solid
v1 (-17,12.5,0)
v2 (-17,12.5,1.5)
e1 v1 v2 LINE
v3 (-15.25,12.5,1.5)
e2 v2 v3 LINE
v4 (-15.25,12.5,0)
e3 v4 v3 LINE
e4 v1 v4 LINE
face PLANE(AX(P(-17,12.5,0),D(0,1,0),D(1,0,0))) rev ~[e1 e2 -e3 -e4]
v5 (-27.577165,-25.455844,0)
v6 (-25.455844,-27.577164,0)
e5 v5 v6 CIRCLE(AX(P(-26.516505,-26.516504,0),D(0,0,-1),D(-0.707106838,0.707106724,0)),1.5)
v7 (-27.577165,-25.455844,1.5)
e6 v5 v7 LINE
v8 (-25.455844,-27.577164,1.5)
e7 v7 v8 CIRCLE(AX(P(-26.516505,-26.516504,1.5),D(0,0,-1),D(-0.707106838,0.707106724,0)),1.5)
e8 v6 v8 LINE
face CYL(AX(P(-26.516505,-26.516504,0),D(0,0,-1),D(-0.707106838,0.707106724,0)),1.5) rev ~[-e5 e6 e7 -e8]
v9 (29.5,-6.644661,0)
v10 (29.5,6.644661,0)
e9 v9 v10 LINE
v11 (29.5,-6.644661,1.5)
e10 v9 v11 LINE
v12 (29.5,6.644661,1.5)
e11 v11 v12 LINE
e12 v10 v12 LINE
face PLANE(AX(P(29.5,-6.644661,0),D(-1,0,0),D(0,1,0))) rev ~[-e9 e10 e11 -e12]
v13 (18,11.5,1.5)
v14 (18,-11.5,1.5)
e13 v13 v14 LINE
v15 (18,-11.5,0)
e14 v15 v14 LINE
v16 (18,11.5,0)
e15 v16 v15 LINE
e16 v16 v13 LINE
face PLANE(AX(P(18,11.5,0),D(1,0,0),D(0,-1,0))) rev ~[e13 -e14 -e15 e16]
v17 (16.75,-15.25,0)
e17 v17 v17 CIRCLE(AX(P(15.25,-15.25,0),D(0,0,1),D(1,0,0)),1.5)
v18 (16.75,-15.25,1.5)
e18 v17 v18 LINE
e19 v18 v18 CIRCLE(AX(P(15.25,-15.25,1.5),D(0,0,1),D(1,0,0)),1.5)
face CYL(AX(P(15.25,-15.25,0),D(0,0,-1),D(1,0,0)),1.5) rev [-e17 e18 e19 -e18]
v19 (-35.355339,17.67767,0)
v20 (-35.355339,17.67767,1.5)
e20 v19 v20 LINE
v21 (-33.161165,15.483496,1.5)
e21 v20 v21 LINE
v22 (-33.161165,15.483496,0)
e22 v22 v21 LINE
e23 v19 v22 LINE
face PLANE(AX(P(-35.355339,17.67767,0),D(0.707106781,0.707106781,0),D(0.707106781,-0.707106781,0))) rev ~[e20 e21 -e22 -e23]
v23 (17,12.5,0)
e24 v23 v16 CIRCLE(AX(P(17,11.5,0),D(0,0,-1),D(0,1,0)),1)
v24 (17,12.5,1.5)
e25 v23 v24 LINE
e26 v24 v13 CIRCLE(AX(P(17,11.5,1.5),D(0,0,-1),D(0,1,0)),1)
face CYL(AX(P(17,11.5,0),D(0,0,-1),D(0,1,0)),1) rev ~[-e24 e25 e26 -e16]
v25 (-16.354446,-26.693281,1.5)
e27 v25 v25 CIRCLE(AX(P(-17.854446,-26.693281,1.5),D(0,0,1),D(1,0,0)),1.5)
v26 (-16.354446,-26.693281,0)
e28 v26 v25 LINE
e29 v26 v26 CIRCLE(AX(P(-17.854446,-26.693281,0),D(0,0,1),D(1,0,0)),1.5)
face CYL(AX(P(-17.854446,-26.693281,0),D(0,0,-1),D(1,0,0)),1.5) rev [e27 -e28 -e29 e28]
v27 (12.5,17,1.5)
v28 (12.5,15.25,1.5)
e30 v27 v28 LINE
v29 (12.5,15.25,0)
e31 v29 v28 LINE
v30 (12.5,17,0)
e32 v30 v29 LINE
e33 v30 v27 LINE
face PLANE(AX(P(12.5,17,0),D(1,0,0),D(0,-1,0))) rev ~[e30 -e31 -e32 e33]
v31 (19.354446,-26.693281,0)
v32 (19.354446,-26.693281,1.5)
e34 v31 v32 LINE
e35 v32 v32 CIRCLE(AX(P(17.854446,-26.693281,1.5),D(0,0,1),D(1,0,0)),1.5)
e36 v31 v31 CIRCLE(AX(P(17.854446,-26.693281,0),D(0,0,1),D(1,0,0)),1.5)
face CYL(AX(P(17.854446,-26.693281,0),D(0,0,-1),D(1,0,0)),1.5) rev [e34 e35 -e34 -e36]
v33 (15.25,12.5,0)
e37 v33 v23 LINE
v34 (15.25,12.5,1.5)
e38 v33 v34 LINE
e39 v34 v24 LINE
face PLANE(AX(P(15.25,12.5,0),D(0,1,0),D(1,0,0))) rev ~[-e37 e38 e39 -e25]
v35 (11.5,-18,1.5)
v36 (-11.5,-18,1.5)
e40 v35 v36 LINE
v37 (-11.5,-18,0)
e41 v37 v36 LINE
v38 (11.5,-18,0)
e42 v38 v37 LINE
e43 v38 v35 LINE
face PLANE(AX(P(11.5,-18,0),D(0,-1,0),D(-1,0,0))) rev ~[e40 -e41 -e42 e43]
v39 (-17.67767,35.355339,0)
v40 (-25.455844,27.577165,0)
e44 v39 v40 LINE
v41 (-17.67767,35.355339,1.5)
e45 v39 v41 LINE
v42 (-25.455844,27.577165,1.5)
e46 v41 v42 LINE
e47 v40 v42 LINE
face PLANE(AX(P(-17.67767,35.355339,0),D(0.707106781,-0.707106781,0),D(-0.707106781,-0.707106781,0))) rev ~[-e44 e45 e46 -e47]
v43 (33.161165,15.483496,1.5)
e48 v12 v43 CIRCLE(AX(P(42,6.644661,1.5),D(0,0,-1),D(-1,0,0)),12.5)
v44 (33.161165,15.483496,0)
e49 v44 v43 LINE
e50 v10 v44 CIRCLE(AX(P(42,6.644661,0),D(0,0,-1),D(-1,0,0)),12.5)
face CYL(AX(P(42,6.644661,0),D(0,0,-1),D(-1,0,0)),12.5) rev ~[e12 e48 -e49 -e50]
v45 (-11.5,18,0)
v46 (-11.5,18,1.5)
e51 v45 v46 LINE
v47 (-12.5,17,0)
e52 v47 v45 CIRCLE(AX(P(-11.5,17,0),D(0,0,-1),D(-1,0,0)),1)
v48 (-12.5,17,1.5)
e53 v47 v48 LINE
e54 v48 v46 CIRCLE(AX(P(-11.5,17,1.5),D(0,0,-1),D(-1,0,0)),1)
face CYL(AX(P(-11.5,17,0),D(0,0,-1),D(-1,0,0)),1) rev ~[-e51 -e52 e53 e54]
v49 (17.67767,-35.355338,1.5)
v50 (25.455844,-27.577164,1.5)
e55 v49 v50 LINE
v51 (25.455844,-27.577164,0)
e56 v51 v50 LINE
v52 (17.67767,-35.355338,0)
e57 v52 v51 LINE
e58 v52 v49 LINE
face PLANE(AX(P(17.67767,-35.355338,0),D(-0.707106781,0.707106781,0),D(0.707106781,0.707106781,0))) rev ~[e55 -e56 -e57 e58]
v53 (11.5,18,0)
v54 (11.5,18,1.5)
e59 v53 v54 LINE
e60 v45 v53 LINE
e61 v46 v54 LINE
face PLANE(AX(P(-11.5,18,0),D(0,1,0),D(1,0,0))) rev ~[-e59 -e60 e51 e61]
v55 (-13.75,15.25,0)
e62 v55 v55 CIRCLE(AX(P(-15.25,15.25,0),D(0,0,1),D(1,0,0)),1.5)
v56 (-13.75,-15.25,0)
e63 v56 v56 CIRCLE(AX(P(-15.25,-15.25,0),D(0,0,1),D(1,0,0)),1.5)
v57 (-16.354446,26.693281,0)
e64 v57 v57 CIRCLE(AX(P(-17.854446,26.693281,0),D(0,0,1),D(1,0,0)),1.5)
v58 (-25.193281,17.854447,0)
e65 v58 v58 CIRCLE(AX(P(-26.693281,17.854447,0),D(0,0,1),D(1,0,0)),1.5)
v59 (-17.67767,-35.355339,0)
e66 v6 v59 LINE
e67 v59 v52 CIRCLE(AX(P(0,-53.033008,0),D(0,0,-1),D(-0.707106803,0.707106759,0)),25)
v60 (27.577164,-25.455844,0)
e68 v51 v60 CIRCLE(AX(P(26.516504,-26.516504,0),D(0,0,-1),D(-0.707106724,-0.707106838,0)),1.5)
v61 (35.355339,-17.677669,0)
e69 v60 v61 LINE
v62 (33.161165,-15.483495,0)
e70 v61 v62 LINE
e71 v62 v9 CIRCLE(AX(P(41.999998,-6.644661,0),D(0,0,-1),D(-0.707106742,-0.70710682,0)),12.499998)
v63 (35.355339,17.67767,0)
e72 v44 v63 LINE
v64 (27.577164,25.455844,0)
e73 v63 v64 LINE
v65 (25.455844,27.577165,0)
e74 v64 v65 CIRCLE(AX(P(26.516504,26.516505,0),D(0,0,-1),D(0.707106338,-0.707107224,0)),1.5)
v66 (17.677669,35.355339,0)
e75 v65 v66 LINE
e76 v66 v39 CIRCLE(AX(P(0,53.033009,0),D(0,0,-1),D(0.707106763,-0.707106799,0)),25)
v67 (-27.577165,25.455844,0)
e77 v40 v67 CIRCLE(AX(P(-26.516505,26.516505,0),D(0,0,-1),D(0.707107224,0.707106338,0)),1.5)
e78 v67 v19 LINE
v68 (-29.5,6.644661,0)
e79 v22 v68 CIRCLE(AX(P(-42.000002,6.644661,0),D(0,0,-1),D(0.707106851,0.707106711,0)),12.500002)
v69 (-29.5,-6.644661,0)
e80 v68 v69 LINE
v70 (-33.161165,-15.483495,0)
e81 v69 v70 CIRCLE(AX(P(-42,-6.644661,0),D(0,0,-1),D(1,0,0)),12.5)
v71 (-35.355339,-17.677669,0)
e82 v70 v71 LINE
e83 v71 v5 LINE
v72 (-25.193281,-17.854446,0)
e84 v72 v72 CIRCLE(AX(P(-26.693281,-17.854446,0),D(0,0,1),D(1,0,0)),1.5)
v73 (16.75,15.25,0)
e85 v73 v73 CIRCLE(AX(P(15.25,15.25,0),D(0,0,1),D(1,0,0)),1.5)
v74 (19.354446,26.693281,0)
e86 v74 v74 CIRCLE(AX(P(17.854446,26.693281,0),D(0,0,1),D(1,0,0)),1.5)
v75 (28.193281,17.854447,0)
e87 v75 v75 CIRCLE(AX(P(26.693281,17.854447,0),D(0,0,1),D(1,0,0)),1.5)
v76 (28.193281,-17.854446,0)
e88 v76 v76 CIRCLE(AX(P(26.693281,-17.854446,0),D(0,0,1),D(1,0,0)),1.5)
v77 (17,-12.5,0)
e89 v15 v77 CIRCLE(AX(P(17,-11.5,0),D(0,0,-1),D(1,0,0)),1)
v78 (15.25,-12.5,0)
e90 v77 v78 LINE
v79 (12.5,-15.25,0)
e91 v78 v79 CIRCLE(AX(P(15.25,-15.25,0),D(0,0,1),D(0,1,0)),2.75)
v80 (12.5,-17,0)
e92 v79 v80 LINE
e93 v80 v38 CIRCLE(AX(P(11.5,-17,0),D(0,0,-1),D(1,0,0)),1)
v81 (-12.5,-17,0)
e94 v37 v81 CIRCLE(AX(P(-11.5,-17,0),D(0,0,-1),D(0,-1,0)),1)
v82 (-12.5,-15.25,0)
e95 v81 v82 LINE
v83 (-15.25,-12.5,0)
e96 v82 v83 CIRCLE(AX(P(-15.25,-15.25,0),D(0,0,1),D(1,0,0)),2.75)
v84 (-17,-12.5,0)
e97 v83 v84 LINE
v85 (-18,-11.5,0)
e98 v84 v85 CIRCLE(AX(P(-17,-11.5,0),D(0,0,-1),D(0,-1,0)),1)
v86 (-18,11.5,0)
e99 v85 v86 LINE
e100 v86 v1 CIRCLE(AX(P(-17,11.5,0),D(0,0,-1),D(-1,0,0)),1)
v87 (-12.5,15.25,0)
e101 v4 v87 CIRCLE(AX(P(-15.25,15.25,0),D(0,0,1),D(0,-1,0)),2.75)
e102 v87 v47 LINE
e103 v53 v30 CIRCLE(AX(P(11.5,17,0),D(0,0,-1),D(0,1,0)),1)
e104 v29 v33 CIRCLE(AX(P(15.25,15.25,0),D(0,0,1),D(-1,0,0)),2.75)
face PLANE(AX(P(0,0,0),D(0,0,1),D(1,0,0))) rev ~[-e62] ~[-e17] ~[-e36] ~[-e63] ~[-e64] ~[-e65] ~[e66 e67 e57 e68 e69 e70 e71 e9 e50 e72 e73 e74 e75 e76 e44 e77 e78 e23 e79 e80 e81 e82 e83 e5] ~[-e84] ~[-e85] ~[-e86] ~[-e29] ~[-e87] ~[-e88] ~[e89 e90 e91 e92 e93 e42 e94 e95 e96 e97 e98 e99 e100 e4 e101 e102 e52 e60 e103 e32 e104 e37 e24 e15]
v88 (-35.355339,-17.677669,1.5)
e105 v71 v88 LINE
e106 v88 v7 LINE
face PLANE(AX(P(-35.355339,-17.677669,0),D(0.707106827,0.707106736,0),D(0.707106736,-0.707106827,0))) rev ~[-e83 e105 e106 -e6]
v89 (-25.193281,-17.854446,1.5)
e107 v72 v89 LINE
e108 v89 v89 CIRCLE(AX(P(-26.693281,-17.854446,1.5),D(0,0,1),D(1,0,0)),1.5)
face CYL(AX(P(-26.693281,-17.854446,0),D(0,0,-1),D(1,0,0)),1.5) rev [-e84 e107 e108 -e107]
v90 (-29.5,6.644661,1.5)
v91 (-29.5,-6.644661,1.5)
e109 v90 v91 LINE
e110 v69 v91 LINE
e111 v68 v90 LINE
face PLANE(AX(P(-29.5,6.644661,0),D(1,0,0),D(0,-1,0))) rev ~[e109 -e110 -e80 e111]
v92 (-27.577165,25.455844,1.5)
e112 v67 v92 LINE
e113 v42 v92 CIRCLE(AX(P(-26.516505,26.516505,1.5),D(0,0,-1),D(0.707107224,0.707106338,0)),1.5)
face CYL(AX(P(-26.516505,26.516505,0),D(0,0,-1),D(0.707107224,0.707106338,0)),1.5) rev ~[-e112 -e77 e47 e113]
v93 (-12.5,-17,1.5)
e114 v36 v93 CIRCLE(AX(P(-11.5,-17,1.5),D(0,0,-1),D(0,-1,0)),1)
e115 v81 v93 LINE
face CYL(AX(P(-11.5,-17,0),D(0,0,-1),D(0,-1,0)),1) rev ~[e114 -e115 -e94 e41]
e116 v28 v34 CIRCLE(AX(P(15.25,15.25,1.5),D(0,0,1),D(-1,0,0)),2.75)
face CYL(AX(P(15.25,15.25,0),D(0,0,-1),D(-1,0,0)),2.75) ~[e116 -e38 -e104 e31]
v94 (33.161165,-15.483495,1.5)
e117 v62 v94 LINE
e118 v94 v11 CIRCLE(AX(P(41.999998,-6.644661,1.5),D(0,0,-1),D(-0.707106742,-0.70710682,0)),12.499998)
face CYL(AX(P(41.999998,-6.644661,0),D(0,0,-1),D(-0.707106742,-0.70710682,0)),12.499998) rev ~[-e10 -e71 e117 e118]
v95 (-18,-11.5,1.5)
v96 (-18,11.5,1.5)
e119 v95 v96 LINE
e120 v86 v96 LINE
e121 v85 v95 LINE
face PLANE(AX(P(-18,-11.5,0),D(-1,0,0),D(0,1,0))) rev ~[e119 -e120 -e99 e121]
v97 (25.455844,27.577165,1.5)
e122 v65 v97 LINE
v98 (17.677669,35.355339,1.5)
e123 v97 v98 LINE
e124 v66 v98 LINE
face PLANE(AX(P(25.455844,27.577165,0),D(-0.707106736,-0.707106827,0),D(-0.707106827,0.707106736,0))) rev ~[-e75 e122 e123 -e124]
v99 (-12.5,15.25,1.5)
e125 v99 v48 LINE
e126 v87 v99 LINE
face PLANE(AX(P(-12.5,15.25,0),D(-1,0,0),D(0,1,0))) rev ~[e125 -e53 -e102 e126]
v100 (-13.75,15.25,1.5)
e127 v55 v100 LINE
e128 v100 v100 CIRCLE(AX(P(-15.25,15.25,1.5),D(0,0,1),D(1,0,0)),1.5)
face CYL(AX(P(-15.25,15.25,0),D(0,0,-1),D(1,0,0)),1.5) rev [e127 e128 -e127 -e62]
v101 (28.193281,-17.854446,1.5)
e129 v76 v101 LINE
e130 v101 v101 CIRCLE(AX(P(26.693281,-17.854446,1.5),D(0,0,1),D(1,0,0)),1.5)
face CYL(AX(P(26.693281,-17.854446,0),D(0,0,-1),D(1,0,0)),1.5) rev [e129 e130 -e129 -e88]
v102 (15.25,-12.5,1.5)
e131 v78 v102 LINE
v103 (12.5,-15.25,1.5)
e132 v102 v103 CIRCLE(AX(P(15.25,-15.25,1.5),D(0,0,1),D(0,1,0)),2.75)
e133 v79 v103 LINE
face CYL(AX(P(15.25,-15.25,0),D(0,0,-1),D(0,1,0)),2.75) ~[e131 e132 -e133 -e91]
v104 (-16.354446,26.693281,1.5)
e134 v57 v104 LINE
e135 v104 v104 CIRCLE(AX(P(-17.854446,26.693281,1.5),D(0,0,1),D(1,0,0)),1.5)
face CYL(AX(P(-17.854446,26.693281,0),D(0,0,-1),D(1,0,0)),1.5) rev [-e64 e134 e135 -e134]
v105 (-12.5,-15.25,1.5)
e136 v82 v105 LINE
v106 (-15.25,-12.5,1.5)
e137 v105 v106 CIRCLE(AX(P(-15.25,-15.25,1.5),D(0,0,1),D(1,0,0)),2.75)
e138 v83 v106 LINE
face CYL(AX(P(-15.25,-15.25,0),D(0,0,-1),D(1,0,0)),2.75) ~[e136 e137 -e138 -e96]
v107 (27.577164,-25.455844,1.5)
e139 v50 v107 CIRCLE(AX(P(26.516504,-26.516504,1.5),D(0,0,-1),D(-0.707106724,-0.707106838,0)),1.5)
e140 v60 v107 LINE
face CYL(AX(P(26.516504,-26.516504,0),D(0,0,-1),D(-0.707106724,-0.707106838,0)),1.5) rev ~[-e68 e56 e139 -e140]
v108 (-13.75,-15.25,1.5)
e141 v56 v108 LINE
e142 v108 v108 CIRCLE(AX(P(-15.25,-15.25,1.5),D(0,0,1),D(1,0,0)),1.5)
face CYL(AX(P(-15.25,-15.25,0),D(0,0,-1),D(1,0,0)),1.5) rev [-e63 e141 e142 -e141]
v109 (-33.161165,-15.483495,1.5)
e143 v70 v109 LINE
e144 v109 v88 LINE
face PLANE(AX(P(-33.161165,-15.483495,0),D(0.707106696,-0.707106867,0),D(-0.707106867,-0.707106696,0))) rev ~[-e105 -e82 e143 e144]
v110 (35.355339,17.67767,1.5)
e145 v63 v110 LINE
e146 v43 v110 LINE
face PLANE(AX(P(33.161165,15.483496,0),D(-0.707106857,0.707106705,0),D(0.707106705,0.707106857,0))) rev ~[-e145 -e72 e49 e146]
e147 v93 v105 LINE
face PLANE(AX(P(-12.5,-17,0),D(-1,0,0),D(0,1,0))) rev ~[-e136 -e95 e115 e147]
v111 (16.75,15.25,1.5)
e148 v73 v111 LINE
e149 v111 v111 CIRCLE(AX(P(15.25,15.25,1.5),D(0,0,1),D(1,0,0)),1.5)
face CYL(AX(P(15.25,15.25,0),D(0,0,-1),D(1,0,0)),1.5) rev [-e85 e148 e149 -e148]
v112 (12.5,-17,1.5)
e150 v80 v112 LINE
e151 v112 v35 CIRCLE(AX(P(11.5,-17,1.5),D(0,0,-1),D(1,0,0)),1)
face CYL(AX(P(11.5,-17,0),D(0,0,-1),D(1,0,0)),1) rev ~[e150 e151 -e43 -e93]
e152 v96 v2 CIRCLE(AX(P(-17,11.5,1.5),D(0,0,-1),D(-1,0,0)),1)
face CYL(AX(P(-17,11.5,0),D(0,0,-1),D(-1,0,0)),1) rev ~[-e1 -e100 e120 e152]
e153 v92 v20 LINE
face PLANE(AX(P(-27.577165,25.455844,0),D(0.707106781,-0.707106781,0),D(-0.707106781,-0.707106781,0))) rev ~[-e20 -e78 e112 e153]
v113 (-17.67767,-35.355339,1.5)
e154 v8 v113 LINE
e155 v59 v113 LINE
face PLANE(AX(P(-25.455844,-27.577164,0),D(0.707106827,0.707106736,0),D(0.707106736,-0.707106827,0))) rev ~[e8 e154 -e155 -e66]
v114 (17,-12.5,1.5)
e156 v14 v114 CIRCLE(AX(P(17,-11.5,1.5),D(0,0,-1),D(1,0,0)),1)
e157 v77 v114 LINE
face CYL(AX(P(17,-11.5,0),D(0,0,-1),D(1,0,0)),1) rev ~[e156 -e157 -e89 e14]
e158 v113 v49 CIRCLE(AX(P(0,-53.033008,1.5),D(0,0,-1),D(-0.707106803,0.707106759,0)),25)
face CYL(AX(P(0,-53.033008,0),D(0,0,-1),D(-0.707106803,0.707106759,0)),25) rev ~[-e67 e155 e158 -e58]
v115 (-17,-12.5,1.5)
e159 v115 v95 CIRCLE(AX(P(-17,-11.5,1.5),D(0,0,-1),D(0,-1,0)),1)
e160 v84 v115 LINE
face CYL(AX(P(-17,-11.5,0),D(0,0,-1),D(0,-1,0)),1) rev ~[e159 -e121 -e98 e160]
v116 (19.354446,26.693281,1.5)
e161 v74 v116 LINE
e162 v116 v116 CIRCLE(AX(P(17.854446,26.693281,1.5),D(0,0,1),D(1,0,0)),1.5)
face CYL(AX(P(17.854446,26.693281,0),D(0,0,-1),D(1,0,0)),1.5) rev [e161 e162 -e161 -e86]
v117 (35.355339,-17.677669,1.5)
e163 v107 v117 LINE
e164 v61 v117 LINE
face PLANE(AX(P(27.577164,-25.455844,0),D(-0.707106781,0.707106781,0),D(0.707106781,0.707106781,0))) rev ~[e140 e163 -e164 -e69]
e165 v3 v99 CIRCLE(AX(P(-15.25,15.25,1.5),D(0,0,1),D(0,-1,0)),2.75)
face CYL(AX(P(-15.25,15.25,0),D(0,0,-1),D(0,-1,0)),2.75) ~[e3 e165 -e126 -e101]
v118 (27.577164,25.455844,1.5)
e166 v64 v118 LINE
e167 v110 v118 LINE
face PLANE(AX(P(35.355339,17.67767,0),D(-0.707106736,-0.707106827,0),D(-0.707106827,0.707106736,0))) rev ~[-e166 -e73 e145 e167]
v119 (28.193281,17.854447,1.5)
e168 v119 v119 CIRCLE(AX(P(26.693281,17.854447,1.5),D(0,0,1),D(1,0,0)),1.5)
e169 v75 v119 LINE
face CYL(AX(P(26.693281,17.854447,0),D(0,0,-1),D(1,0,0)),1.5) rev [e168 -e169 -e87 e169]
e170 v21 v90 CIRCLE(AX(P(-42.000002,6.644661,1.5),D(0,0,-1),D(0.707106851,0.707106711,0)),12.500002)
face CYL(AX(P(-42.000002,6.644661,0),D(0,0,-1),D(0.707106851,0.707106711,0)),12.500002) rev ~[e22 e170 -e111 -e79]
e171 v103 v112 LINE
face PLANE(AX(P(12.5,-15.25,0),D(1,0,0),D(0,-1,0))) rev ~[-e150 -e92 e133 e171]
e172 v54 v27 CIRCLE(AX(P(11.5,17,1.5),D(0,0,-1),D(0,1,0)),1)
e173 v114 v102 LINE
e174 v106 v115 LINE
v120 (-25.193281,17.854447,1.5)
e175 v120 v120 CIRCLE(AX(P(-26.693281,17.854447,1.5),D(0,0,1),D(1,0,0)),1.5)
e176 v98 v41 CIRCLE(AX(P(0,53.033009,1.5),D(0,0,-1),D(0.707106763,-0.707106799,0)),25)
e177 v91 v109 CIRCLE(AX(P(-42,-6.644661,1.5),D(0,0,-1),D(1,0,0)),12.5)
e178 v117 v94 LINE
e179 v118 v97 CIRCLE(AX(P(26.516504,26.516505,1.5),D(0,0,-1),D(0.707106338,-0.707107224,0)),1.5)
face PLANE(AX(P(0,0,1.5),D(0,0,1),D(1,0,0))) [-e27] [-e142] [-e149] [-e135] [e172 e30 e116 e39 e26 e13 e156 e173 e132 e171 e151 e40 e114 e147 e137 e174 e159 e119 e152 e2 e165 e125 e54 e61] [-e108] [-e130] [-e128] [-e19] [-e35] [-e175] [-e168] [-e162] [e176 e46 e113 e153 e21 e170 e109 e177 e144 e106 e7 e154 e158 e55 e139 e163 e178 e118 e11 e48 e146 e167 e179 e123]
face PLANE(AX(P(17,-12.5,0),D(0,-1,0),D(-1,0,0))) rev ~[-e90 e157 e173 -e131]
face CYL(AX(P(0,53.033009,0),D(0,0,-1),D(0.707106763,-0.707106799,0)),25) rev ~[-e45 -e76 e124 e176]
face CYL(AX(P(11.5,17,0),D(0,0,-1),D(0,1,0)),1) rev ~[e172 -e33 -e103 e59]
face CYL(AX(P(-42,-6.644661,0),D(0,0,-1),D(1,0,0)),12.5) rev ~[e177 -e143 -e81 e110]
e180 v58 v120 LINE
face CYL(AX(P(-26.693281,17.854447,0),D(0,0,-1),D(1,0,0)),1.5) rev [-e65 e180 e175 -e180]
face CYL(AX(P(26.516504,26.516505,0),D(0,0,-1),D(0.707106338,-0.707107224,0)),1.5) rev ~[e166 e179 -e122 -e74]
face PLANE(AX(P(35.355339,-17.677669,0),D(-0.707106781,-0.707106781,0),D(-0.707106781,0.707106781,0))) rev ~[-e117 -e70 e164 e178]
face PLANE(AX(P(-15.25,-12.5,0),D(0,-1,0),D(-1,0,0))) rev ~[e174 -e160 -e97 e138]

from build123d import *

# Parameters (mm, degrees)
F0_R     = 1.5
F1_DEPTH = 1.5


# Not quite as in the source:
# - ends of sketch curves that miss each other by under 0.0002 mm in the source are joined


with BuildPart() as f1:
    # F0 (on Top) → F1 (new body)
    with BuildSketch(Plane.XY):
        with BuildLine():
            Line((-29.5, 6.644661), (-29.5, 0))
            Line((-29.5, 0), (-29.5, -6.644661))
            ThreePointArc((-29.5, -6.644661), (-30.4515057083, -11.4282035779), (-33.1611647352, -15.4834952648))
            Line((-33.1611647352, -15.4834952648), (-35.355339, -17.677669))
            Line((-35.355339, -17.677669), (-27.577165, -25.455844))
            ThreePointArc((-27.577165, -25.455844), (-25.4558450782, -25.4558435782), (-25.4558443282, -27.5771636718))
            Line((-25.4558443282, -27.5771636718), (-17.67767, -35.355339))
            ThreePointArc((-17.67767, -35.355339), (-3.536e-07, -28.033008), (17.6776695297, -35.3553384703))
            Line((17.6776695297, -35.3553384703), (25.455844, -27.577164))
            ThreePointArc((25.455844, -27.577164), (25.4558438282, -25.4558438282), (27.5771641718, -25.4558438282))
            Line((27.5771641718, -25.4558438282), (35.355339, -17.677669))
            Line((35.355339, -17.677669), (33.161165, -15.483495))
            ThreePointArc((33.161165, -15.483495), (30.4515057083, -11.4282035779), (29.5, -6.644661))
            Line((29.5, -6.644661), (29.5, 0))
            Line((29.5, 0), (29.5, 6.644661))
            ThreePointArc((29.5, 6.644661), (30.4515058436, 11.4282039046), (33.1611652352, 15.4834957648))
            Line((33.1611652352, 15.4834957648), (35.355339, 17.67767))
            Line((35.355339, 17.67767), (27.577164, 25.455844))
            ThreePointArc((27.577164, 25.455844), (25.4558435782, 25.4558450782), (25.4558438282, 27.5771651718))
            Line((25.4558438282, 27.5771651718), (17.677669, 35.355339))
            ThreePointArc((17.677669, 35.355339), (-3.536e-07, 28.033009), (-17.6776695297, 35.3553394703))
            Line((-17.6776695297, 35.3553394703), (-25.455844, 27.577165))
            ThreePointArc((-25.455844, 27.577165), (-25.4558448282, 25.4558448282), (-27.5771646718, 25.4558443282))
            Line((-27.5771646718, 25.4558443282), (-35.355339, 17.67767))
            Line((-35.355339, 17.67767), (-33.161165, 15.483496))
            ThreePointArc((-33.161165, 15.483496), (-30.4515058436, 11.4282039046), (-29.5, 6.644661))
        make_face()
        with Locations((-17.854446, -26.693281)):
            Circle(F0_R, mode=Mode.SUBTRACT)
        with Locations((-26.693281, -17.854446)):
            Circle(F0_R, mode=Mode.SUBTRACT)
        with Locations((-15.25, -15.25)):
            Circle(F0_R, mode=Mode.SUBTRACT)
        with Locations((17.854446, -26.693281)):
            Circle(F0_R, mode=Mode.SUBTRACT)
        with Locations((26.693281, -17.854446)):
            Circle(F0_R, mode=Mode.SUBTRACT)
        with Locations((15.25, -15.25)):
            Circle(F0_R, mode=Mode.SUBTRACT)
        with BuildLine():
            Line((11.5, -18), (-11.5, -18))
            ThreePointArc((-11.5, -18), (-12.2071067812, -17.7071067812), (-12.5, -17))
            Line((-12.5, -17), (-12.5, -15.25))
            ThreePointArc((-12.5, -15.25), (-13.3054563517, -13.3054563517), (-15.25, -12.5))
            Line((-15.25, -12.5), (-17, -12.5))
            ThreePointArc((-17, -12.5), (-17.7071067812, -12.2071067812), (-18, -11.5))
            Line((-18, -11.5), (-18, 11.5))
            ThreePointArc((-18, 11.5), (-17.7071067812, 12.2071067812), (-17, 12.5))
            Line((-17, 12.5), (-15.25, 12.5))
            ThreePointArc((-15.25, 12.5), (-13.3054563517, 13.3054563517), (-12.5, 15.25))
            Line((-12.5, 15.25), (-12.5, 17))
            ThreePointArc((-12.5, 17), (-12.2071067812, 17.7071067812), (-11.5, 18))
            Line((-11.5, 18), (11.5, 18))
            ThreePointArc((11.5, 18), (12.2071067812, 17.7071067812), (12.5, 17))
            Line((12.5, 17), (12.5, 15.25))
            ThreePointArc((12.5, 15.25), (13.3054563517, 13.3054563517), (15.25, 12.5))
            Line((15.25, 12.5), (17, 12.5))
            ThreePointArc((17, 12.5), (17.7071067812, 12.2071067812), (18, 11.5))
            Line((18, 11.5), (18, -11.5))
            ThreePointArc((18, -11.5), (17.7071067812, -12.2071067812), (17, -12.5))
            Line((17, -12.5), (15.25, -12.5))
            ThreePointArc((15.25, -12.5), (13.3054563517, -13.3054563517), (12.5, -15.25))
            Line((12.5, -15.25), (12.5, -17))
            ThreePointArc((12.5, -17), (12.2071067812, -17.7071067812), (11.5, -18))
        make_face(mode=Mode.SUBTRACT)
        with Locations((-15.25, 15.25)):
            Circle(F0_R, mode=Mode.SUBTRACT)
        with Locations((-26.693281, 17.854447)):
            Circle(F0_R, mode=Mode.SUBTRACT)
        with Locations((-17.854446, 26.693281)):
            Circle(F0_R, mode=Mode.SUBTRACT)
        with Locations((15.25, 15.25)):
            Circle(F0_R, mode=Mode.SUBTRACT)
        with Locations((26.693281, 17.854447)):
            Circle(F0_R, mode=Mode.SUBTRACT)
        with Locations((17.854446, 26.693281)):
            Circle(F0_R, mode=Mode.SUBTRACT)
    extrude(amount=F1_DEPTH)


solid = f1.part
